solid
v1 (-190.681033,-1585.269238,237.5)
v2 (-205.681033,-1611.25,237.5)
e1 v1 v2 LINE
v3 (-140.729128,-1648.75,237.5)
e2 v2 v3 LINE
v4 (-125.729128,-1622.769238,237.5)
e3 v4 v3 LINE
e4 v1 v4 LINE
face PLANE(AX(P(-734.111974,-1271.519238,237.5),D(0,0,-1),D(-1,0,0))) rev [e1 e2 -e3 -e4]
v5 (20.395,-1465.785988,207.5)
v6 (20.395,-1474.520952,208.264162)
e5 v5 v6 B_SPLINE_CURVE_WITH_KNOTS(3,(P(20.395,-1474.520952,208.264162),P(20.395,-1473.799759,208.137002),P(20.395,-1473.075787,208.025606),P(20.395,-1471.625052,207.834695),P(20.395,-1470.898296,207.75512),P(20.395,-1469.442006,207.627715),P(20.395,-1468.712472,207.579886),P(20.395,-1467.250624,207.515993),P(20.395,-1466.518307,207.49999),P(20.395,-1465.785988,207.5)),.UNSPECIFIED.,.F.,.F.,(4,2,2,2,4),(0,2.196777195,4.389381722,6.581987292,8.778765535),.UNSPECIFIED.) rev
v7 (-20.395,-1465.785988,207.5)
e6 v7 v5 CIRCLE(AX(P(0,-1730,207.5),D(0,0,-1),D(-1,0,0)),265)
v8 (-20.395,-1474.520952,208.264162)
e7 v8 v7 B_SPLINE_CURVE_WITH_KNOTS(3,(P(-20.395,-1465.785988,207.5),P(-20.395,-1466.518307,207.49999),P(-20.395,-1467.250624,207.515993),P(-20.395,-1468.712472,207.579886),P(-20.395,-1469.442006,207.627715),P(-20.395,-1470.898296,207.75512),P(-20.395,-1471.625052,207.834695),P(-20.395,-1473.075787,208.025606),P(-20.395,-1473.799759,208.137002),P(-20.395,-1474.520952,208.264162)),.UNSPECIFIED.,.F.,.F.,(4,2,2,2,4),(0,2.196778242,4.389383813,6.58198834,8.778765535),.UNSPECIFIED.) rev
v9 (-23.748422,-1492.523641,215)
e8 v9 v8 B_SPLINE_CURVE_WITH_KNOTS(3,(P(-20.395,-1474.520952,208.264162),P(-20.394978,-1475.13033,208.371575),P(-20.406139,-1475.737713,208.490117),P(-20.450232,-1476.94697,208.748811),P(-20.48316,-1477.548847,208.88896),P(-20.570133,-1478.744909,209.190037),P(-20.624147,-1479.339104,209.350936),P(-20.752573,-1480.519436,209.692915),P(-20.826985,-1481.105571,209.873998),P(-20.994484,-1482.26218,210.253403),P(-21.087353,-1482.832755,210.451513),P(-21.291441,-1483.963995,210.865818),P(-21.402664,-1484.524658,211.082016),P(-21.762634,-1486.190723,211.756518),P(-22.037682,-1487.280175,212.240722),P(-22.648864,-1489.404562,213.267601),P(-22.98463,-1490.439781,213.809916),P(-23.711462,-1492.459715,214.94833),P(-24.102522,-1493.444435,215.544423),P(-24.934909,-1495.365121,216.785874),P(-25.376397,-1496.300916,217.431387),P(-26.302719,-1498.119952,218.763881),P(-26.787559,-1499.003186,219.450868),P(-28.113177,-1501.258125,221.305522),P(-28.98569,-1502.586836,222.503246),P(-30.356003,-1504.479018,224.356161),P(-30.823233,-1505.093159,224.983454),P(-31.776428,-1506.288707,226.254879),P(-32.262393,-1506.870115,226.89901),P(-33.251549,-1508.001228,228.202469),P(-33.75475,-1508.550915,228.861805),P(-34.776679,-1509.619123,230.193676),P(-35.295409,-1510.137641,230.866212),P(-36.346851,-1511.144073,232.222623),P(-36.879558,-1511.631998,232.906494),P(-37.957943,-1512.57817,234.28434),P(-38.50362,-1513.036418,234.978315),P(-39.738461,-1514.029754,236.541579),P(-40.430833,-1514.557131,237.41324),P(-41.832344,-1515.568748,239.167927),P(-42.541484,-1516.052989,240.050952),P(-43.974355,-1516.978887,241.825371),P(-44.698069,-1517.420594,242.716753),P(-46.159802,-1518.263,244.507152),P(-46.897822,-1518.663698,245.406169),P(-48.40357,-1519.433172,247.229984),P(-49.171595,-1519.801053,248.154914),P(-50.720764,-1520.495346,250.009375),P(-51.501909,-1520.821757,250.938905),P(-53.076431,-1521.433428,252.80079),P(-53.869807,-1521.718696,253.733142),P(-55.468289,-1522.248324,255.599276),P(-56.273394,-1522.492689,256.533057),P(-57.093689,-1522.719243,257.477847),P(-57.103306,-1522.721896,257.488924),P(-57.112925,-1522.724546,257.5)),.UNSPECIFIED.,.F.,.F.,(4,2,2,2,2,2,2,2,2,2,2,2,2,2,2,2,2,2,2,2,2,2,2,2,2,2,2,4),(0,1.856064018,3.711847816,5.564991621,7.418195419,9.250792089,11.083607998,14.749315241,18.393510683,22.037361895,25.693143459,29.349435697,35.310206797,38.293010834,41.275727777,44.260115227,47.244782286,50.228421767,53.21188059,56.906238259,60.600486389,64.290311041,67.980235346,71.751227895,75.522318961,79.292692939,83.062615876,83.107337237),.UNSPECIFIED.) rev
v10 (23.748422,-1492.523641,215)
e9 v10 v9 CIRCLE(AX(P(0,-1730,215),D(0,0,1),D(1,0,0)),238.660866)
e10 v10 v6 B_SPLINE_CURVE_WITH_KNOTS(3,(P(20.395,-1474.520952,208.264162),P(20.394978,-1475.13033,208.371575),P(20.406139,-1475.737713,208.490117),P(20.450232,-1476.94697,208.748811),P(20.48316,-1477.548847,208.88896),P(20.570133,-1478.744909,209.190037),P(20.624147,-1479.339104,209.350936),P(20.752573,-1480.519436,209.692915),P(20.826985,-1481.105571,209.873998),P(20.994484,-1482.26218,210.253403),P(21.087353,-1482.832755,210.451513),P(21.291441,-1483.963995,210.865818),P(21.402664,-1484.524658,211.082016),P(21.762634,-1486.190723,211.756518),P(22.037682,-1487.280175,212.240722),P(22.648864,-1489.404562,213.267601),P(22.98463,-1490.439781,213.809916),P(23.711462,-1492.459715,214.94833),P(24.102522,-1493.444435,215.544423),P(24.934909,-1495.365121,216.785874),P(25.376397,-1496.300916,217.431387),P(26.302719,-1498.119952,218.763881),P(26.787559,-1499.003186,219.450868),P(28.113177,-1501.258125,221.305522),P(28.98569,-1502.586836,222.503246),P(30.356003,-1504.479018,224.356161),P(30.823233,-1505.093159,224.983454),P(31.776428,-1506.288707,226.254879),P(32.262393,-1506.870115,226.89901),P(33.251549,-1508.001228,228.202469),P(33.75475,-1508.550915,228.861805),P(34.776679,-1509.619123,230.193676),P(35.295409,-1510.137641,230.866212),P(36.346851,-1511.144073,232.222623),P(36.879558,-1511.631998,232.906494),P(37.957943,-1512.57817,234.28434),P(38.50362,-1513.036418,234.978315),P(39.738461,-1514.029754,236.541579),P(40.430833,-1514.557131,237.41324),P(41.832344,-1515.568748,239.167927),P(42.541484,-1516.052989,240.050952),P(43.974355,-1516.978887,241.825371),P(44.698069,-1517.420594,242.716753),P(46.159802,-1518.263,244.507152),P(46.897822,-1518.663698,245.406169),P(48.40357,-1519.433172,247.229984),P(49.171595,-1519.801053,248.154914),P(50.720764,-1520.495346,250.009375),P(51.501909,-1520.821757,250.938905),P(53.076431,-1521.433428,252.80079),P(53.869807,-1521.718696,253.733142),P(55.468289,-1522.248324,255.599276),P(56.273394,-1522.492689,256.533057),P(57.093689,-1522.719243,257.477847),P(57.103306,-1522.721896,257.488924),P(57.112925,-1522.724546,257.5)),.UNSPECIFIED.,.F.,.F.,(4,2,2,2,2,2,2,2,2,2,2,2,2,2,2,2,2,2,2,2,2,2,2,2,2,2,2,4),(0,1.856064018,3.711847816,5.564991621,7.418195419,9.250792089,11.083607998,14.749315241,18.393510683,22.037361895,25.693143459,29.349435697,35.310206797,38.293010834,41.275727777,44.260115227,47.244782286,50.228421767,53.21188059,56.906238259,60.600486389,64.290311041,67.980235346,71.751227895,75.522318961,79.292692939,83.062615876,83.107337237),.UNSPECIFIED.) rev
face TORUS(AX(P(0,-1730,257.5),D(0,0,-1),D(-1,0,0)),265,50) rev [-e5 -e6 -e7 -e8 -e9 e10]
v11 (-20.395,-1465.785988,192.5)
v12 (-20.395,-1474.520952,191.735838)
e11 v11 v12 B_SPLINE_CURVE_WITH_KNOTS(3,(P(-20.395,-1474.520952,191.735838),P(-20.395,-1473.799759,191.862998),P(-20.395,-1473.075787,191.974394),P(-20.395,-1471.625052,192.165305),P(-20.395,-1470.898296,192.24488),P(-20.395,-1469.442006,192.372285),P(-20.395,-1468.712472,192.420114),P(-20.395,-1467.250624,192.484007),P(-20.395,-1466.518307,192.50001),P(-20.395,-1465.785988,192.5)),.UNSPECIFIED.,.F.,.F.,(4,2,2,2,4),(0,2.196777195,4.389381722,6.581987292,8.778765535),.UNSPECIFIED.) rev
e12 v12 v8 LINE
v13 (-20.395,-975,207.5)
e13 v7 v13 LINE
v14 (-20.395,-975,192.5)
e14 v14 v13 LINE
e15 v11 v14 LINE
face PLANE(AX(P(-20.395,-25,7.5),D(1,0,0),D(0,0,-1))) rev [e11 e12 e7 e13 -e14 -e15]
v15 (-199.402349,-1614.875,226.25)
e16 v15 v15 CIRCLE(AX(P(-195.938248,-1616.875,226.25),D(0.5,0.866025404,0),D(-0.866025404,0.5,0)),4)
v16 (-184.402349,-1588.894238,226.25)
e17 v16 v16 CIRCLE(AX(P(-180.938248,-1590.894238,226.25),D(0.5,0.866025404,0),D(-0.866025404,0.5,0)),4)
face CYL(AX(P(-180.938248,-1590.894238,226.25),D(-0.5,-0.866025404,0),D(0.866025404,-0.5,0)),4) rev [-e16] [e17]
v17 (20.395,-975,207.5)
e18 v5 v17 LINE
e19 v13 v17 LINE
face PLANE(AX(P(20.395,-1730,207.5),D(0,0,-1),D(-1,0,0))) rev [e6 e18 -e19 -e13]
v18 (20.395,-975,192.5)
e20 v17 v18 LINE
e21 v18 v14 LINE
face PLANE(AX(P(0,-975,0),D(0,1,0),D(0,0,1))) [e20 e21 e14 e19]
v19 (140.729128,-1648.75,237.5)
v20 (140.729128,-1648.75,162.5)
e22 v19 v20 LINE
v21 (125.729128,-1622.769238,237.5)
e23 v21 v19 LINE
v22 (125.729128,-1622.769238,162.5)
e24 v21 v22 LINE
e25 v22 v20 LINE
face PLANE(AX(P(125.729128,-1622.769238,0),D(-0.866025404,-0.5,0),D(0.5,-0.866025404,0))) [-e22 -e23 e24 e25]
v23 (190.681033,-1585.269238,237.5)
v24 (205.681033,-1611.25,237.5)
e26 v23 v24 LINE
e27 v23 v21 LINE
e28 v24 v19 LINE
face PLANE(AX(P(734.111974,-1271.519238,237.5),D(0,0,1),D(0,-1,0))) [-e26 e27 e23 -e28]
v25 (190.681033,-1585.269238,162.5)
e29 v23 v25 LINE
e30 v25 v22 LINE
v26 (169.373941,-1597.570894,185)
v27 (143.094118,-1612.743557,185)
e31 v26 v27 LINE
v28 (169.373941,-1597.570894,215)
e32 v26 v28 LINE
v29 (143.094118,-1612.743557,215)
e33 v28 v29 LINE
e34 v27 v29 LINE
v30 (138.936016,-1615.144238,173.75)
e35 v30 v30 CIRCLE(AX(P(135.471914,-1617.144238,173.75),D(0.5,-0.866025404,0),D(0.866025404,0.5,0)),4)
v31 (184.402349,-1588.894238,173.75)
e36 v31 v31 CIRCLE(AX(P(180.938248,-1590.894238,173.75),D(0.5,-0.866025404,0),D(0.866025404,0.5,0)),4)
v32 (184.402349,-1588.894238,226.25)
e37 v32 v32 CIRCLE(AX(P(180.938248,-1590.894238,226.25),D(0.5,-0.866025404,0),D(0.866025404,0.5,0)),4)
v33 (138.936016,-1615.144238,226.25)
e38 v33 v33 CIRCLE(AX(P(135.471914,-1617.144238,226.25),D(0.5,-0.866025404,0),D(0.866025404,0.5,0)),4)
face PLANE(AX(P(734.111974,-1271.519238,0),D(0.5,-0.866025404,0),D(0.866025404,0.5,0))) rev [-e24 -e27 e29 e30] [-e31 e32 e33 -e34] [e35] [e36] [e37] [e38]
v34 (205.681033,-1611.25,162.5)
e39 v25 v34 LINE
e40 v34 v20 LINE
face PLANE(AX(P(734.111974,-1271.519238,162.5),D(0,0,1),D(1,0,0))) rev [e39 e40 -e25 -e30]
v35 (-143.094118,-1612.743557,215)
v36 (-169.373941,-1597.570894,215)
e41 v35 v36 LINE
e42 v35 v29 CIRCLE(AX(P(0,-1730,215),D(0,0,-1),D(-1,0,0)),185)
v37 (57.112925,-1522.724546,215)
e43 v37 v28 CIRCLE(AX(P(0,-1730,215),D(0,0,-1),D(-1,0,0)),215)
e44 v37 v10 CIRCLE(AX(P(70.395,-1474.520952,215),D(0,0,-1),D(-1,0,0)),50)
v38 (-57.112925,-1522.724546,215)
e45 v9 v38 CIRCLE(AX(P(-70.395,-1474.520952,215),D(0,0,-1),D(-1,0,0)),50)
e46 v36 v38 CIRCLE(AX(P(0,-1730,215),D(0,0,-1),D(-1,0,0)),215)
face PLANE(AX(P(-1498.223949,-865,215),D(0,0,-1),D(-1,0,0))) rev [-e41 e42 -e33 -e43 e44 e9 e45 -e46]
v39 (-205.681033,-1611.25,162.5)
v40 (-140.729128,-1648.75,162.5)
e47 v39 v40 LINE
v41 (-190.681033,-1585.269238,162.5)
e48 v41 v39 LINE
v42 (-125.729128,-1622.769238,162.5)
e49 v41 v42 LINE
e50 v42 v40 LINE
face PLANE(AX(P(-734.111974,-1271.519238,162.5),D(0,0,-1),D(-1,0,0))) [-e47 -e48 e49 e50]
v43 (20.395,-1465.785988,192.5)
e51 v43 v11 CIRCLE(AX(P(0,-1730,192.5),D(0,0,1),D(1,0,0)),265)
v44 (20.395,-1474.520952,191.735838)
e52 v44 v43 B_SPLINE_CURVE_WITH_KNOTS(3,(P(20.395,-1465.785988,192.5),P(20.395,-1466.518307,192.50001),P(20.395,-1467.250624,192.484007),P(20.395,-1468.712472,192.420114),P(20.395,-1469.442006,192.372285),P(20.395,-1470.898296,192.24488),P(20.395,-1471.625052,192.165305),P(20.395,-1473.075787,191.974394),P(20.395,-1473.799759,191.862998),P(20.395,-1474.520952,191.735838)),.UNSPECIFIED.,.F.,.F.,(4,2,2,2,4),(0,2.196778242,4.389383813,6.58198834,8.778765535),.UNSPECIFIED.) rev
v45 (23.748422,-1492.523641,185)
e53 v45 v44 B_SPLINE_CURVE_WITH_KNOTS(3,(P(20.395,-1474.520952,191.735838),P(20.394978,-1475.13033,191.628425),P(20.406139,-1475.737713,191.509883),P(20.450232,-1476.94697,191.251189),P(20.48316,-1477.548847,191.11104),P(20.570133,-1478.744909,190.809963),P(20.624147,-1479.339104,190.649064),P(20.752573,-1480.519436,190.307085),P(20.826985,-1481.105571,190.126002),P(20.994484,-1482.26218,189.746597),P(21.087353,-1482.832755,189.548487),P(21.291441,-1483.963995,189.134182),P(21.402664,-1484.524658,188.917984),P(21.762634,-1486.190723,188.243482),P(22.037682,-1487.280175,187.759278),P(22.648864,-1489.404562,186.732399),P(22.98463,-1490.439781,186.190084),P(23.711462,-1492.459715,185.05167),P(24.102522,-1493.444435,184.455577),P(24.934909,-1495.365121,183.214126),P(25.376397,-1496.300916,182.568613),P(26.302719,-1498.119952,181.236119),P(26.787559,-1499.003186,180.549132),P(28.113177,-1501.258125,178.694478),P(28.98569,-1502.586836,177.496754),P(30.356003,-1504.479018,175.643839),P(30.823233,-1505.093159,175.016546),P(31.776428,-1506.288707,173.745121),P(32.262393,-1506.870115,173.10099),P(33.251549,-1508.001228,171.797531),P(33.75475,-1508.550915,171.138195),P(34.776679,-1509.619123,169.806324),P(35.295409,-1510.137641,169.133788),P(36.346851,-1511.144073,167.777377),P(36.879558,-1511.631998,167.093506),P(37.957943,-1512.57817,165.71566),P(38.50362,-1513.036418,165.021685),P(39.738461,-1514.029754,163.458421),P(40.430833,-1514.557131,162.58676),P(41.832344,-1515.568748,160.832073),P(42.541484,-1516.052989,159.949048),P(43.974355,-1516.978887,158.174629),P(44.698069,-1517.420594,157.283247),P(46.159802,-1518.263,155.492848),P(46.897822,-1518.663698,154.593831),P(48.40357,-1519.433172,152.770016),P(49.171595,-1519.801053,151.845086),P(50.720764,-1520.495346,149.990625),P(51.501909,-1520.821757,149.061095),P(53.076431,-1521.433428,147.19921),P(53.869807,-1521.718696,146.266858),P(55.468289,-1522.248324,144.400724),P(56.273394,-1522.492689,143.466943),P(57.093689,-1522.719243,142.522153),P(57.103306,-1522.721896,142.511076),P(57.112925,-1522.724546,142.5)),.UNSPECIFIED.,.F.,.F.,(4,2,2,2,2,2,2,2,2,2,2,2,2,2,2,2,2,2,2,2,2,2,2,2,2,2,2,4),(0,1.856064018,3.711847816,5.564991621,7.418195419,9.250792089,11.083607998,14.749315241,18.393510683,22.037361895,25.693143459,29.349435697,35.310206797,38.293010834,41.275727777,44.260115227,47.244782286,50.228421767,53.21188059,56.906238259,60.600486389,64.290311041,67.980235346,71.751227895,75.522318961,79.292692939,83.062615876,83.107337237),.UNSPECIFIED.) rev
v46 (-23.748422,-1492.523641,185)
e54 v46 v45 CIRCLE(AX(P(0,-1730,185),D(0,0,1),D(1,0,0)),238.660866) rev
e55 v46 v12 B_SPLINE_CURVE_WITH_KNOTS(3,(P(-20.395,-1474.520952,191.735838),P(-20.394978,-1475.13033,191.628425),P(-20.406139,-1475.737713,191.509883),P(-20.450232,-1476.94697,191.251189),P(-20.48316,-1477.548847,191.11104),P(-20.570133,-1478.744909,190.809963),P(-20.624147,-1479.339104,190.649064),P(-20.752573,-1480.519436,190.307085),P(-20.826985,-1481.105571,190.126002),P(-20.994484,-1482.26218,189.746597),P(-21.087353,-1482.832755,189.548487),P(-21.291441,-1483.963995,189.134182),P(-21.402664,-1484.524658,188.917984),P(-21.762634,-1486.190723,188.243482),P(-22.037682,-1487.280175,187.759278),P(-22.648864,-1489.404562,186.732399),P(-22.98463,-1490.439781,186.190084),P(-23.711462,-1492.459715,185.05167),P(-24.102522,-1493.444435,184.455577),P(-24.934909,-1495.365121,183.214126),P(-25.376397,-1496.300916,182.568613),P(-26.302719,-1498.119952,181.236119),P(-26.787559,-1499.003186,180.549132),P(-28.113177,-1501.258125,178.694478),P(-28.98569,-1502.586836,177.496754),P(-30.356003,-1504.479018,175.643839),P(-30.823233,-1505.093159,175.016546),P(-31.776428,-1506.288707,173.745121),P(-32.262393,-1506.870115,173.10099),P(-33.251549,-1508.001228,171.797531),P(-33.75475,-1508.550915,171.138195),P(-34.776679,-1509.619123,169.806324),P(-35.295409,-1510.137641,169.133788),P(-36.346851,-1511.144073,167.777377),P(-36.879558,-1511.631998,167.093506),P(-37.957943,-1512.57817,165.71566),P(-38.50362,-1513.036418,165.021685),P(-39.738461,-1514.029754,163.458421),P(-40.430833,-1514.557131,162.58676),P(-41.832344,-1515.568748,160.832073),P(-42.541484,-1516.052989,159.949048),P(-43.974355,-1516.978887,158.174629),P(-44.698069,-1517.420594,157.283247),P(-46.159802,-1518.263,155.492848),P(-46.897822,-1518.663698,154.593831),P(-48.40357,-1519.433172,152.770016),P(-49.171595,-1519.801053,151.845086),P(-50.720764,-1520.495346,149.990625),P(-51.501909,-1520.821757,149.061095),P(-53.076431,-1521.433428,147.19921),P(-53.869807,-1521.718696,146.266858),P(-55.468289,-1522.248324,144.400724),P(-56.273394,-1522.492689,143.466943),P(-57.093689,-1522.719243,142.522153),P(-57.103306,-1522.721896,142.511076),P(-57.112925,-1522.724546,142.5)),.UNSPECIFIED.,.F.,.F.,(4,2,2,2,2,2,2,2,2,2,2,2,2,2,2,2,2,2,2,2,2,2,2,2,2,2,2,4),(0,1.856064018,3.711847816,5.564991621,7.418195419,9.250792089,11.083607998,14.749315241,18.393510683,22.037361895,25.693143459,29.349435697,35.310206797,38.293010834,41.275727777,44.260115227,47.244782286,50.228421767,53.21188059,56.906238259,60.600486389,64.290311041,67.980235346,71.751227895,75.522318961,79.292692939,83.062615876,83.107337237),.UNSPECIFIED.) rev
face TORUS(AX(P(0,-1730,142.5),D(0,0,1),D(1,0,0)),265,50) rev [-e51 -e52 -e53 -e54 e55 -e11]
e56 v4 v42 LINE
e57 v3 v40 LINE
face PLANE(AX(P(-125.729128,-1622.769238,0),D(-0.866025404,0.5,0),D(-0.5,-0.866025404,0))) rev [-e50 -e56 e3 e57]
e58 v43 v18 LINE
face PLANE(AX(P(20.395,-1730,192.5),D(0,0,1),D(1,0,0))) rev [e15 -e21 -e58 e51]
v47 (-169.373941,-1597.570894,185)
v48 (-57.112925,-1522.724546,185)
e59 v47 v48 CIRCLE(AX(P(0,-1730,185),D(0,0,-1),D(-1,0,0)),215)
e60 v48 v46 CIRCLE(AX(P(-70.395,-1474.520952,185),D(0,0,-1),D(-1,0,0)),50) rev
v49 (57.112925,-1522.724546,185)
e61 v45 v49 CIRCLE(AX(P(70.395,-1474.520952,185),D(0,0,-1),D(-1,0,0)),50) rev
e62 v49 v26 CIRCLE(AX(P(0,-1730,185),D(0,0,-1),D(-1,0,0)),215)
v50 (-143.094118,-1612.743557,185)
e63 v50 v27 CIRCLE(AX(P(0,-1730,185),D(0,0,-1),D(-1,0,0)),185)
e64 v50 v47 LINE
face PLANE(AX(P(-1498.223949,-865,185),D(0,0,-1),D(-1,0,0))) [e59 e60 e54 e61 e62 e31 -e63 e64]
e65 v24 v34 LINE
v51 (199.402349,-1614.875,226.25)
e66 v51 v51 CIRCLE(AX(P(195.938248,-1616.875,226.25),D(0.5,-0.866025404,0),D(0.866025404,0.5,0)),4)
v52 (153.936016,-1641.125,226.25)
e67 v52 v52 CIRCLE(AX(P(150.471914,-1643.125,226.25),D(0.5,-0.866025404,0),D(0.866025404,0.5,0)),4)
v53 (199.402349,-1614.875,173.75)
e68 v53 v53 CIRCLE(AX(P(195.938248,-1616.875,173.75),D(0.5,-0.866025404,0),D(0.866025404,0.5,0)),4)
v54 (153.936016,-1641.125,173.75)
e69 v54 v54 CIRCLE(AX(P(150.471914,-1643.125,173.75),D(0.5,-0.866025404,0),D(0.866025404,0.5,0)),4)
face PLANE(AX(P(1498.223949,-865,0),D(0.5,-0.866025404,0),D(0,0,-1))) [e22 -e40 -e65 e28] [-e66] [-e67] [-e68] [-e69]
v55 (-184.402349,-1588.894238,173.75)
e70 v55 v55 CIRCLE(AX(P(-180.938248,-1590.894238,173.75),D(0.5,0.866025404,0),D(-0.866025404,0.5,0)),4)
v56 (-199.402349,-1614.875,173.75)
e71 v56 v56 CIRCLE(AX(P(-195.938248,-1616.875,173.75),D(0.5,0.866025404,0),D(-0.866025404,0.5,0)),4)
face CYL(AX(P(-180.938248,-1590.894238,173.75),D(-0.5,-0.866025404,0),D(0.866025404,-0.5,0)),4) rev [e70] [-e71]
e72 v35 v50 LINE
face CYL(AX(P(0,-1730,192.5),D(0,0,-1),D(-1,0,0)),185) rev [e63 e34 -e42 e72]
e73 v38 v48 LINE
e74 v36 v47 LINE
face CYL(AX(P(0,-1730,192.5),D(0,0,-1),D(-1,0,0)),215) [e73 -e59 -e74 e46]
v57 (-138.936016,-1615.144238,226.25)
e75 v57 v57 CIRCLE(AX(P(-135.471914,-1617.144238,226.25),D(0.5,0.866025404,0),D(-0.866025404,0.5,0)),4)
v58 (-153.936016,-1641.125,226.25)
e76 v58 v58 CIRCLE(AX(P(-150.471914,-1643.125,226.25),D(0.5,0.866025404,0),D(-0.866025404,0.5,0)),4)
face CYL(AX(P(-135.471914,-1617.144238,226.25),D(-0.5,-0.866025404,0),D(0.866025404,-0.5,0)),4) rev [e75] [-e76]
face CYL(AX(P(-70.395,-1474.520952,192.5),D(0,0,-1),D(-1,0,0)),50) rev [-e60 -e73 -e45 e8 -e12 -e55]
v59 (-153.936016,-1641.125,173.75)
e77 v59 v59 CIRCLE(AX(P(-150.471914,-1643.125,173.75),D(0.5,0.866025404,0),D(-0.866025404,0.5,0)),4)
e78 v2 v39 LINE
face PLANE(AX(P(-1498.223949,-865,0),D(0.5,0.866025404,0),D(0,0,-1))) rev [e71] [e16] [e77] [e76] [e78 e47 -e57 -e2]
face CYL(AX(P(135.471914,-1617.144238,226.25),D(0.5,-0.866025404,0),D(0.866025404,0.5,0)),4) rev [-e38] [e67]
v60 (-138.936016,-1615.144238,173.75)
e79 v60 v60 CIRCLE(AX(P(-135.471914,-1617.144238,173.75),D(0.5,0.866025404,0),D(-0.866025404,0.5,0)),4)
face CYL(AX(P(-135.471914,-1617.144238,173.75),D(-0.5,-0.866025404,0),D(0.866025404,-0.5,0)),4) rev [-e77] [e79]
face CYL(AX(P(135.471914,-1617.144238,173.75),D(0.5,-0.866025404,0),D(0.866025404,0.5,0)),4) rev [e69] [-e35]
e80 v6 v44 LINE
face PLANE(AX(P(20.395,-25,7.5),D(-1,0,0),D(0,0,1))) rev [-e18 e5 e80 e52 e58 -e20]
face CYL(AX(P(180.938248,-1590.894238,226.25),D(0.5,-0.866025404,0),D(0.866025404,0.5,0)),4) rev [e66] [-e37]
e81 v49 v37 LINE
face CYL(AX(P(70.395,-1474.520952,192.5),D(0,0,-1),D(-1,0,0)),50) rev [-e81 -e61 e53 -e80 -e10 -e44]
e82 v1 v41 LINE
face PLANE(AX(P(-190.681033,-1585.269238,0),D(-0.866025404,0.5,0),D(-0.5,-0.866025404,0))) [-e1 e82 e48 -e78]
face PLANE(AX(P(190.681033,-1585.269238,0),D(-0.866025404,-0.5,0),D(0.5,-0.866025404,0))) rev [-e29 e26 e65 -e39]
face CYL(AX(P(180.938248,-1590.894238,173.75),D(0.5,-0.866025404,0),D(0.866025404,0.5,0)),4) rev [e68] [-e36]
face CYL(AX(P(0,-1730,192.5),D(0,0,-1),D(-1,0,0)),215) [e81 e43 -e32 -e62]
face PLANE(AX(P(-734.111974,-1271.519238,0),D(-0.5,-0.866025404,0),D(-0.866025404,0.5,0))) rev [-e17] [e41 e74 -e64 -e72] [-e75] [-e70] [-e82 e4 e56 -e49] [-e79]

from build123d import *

# Parameters (mm, degrees)
SKETCH1_R                = 8.2
BOSS_EXTRUDE1_DEPTH      = 25
SKETCH2_W                = 40.79
SKETCH2_H                = 15
BOSS_EXTRUDE2_DEPTH      = 25
SKETCH3_R                = 12.5
BOSS_EXTRUDE4_DEPTH      = 25
BOSS_EXTRUDE5_REACH      = 51.448
SKETCH5_W                = 40.79
SKETCH5_H                = 15
BOSS_EXTRUDE7_DEPTH      = 1505
BOSS_EXTRUDE8_START      = -40.79
BOSS_EXTRUDE8_DEPTH      = 40.79
SKETCH9_W                = 15
SKETCH9_H                = 15
REVOLVE1_ANGLE           = 60
REVOLVE1_OTHER_WAY_ANGLE = 60
FILLET3_R                = 50
SKETCH11_W               = 75
SKETCH11_H               = 75
SKETCH11_R               = 4
BOSS_EXTRUDE9_DEPTH      = 30
CUT_EXTRUDE2_DEPTH       = 1755.203433898
SKETCH16_R               = 677.859439882
CUT_EXTRUDE3_DEPTH       = 1049.19413159


with BuildPart() as part:
    # Sketch1 → Boss-Extrude1 (new body)
    with BuildSketch(Plane(origin=(0, 0, 0), x_dir=(1, 0, 0), z_dir=(0, 1, 0))):
        with Locations(Location((0, 0, 0), (0, 0, 270))):
            Circle(SKETCH1_R)
    extrude(amount=BOSS_EXTRUDE1_DEPTH)

    # Sketch2 → Boss-Extrude2 (add)
    with BuildSketch(Plane(origin=(0, 0, 0), x_dir=(-1, 0, 0), z_dir=(0, -1, 0))):
        Rectangle(SKETCH2_W, SKETCH2_H)
    extrude(amount=BOSS_EXTRUDE2_DEPTH)

    # Sketch3 → Boss-Extrude4 (add)
    with BuildSketch(Plane(origin=(0, -25, 0), x_dir=(-1, 0, 0), z_dir=(0, -1, 0))):
        Circle(SKETCH3_R)
    extrude(amount=-BOSS_EXTRUDE4_DEPTH)

    # Boss-Extrude5: up to this face of the body (flat: up to its plane)
    boss_extrude5_end = Plane(part.part.faces().sort_by_distance((20.395, -12.5, 0))[0])
    # Sketch4 → Boss-Extrude5 (add, up to the picked face)
    with BuildSketch(Plane.ZY.offset(20.395), mode=Mode.PRIVATE) as boss_extrude5_sk1:
        Polygon((192.5, -225), (-7.5, -25), (7.5, -25), (207.5, -225), align=None)
    boss_extrude5_tool1 = split(extrude(boss_extrude5_sk1.sketch, amount=-BOSS_EXTRUDE5_REACH, mode=Mode.PRIVATE), bisect_by=boss_extrude5_end, keep=Keep.BOTH, mode=Mode.PRIVATE)
    add(boss_extrude5_tool1.solids().sort_by(Axis((-20.395, -125, 100), (1, 0, 0)))[0])

    # Sketch5 → Boss-Extrude7 (add)
    with BuildSketch(Plane(origin=(0, -225, 0), x_dir=(-1, 0, 0), z_dir=(0, -1, 0))):
        with Locations((0, -200)):
            Rectangle(SKETCH5_W, SKETCH5_H)
    extrude(amount=BOSS_EXTRUDE7_DEPTH)

    # Sketch7 → Boss-Extrude8 (add)
    with BuildSketch(Plane(origin=(20.395, 0, 0), x_dir=(0, 0, -1), z_dir=(1, 0, 0)).offset(BOSS_EXTRUDE8_START)):
        Polygon((1.552099385, -34.052099385), (0, -32.5), (-192.5, -225), (-192.5, -228.104198769), align=None)
        Polygon((7.5, -25), (0, -32.5), (1.552099385, -34.052099385), (7.5, -28.104198769), align=None)
        Polygon((-9.052099385, -23.447900615), (-207.5, -221.895801231), (-207.5, -225), (-7.5, -25), align=None)
        Polygon((-9.052099385, -23.447900615), (-7.5, -25), (-7.5, -21.895801231), align=None)
    extrude(amount=BOSS_EXTRUDE8_DEPTH)

    # Sketch9 → Revolve1 (revolve)
    with BuildSketch(Plane(origin=(0, 0, 0), x_dir=(0, 0, -1), z_dir=(1, 0, 0))):
        with Locations((-207.5, -1522.5)):
            Rectangle(SKETCH9_W, SKETCH9_H)
        Polygon((-185, -1545), (-185, -1530), (-200, -1530), (-215, -1530), (-215, -1545), align=None)
        with Locations((-192.5, -1522.5)):
            Rectangle(SKETCH9_W, SKETCH9_H)
    revolve(axis=Axis((0, -1730, 192.5), (0, 0, 1)), revolution_arc=REVOLVE1_ANGLE)

    # Sketch9 → Revolve1 other way (revolve)
    with BuildSketch(Plane(origin=(0, 0, 0), x_dir=(0, 0, -1), z_dir=(1, 0, 0))):
        with Locations((-207.5, -1522.5)):
            Rectangle(SKETCH9_W, SKETCH9_H)
        Polygon((-185, -1545), (-185, -1530), (-200, -1530), (-215, -1530), (-215, -1545), align=None)
        with Locations((-192.5, -1522.5)):
            Rectangle(SKETCH9_W, SKETCH9_H)
    revolve(axis=Axis((0, -1730, 192.5), (0, 0, -1)), revolution_arc=REVOLVE1_OTHER_WAY_ANGLE)

    # Fillet3
    # the kernel refuses this fillet: 50 mm, written as the material it adds along each edge
    with BuildSketch(Plane(origin=(0, -1730, 207.5), x_dir=(0.6259913130832682, 0.7798300301631668, 0), z_dir=(0.7798300301631668, -0.6259913130832682, 0))) as fillet3_piece_1_section:
        with BuildLine():
            CenterArc((215 + FILLET3_R, FILLET3_R), FILLET3_R, 180, 90)
            Line((215, FILLET3_R), (215, 0))
            Line((215, 0), (215 + FILLET3_R, 0))
        make_face()
    fillet3_piece_1 = revolve(axis=Axis((0, -1730, 207.5), (0, 0, 1)), revolution_arc=77.509968484, mode=Mode.PRIVATE)
    fillet3_piece_1 = split(fillet3_piece_1, bisect_by=Plane(origin=(20.395, -1497.728593149, 210.201005202), z_dir=(-1, 0, 0)), keep=Keep.TOP, mode=Mode.PRIVATE)
    fillet3_piece_1 = split(fillet3_piece_1, bisect_by=Plane(origin=(-20.395, -1497.728593149, 210.201005202), z_dir=(1, 0, 0)), keep=Keep.TOP, mode=Mode.PRIVATE)
    fillet3_piece_1 = split(fillet3_piece_1, bisect_by=Plane(origin=(0, -1497.728593149, 215), z_dir=(0, 0, -1)), keep=Keep.TOP, mode=Mode.PRIVATE)
    add(fillet3_piece_1)
    with BuildSketch(Plane(origin=(-20.395, -1515.969525593, 192.5), x_dir=(-0.9834951946600375, -0.1809342479482942, 0), z_dir=(0, 0, 1))) as fillet3_piece_2:
        with BuildLine():
            CenterArc((41.675293239, -49.811185367), FILLET3_R, 94.980893043, 74.594925131)
            Line((-7.499466494, -40.764472969), (0, 0))
            ThreePointArc((0, 0), (18.66705843, -0.811902923), (37.33411686, 0))
        make_face()
    extrude(amount=15)
    with BuildSketch(Plane(origin=(0, -1730, 192.5), x_dir=(0.6259913130832687, 0.7798300301631664, 0), z_dir=(0.7798300301631664, -0.6259913130832687, 0))) as fillet3_piece_3_section:
        with BuildLine():
            CenterArc((215 + FILLET3_R, -FILLET3_R), FILLET3_R, 90, 90)
            Line((215 + FILLET3_R, 0), (215, 0))
            Line((215, 0), (215, -FILLET3_R))
        make_face()
    fillet3_piece_3 = revolve(axis=Axis((0, -1730, 192.5), (0, 0, 1)), revolution_arc=77.509968484, mode=Mode.PRIVATE)
    fillet3_piece_3 = split(fillet3_piece_3, bisect_by=Plane(origin=(0, -1497.728593149, 185), z_dir=(0, 0, 1)), keep=Keep.TOP, mode=Mode.PRIVATE)
    fillet3_piece_3 = split(fillet3_piece_3, bisect_by=Plane(origin=(-20.395, -1497.728593149, 189.798994798), z_dir=(1, 0, 0)), keep=Keep.TOP, mode=Mode.PRIVATE)
    fillet3_piece_3 = split(fillet3_piece_3, bisect_by=Plane(origin=(20.395, -1497.728593149, 189.798994798), z_dir=(-1, 0, 0)), keep=Keep.TOP, mode=Mode.PRIVATE)
    add(fillet3_piece_3)
    with BuildSketch(Plane(origin=(20.395, -1515.969525593, 192.5), x_dir=(0.9834951946600374, -0.18093424794829469, 0), z_dir=(0, 0, 1))) as fillet3_piece_4:
        with BuildLine():
            CenterArc((41.675293239, 49.811185367), FILLET3_R, 190.424181826, 74.594925131)
            Line((-7.499466494, 40.764472969), (0, 0))
            ThreePointArc((0, 0), (18.66705843, 0.811902923), (37.33411686, 0))
        make_face()
    extrude(amount=15)
    with BuildSketch(Plane(origin=(0, -1730, 207.5), x_dir=(0.6259913130832682, 0.7798300301631668, 0), z_dir=(0.7798300301631668, -0.6259913130832682, 0))) as fillet3_piece_5a_section:
        with BuildLine():
            CenterArc((215 + FILLET3_R, FILLET3_R), FILLET3_R, 180, 90)
            Line((215, FILLET3_R), (215, 0))
            Line((215, 0), (215 + FILLET3_R, 0))
        make_face()
    fillet3_piece_5a = revolve(axis=Axis((0, -1730, 207.5), (0, 0, 1)), revolution_arc=77.509968484, mode=Mode.PRIVATE)
    fillet3_piece_5a = split(fillet3_piece_5a, bisect_by=Plane(origin=(20.395, -1516.663886588, 210.150724115), z_dir=(1, 0, 0)), keep=Keep.TOP, mode=Mode.PRIVATE)
    fillet3_piece_5a = split(fillet3_piece_5a, bisect_by=Plane(origin=(85.698064456, -1516.663886588, 215), z_dir=(0, 0, -1)), keep=Keep.TOP, mode=Mode.PRIVATE)
    with BuildSketch(Plane(origin=(20.395, -1515.969525593, 192.5), x_dir=(0.9834951946600374, -0.18093424794829469, 0), z_dir=(0, 0, 1))) as fillet3_piece_5b_section:
        with BuildLine():
            CenterArc((41.675293239, 49.811185367), FILLET3_R, 190.424181826, 74.594925131)
            Line((-7.499466494, 40.764472969), (0, 0))
            ThreePointArc((0, 0), (18.66705843, 0.811902923), (37.33411686, 0))
        make_face()
    fillet3_piece_5b = extrude(amount=118.621434021, mode=Mode.PRIVATE)
    fillet3_piece_5b = split(fillet3_piece_5b, bisect_by=Plane(origin=(28.539652215, -1507.603520272, 207.5), z_dir=(0, 0, 1)), keep=Keep.TOP, mode=Mode.PRIVATE)
    fillet3_piece_5b = split(fillet3_piece_5b, bisect_by=Plane(origin=(28.539652215, -1507.603520272, 215), z_dir=(0, 0, -1)), keep=Keep.TOP, mode=Mode.PRIVATE)
    fillet3_piece_5 = fillet3_piece_5a & fillet3_piece_5b
    add(fillet3_piece_5)
    with BuildSketch(Plane(origin=(0, -1730, 207.5), x_dir=(0.6259913130832682, 0.7798300301631668, 0), z_dir=(0.7798300301631668, -0.6259913130832682, 0))) as fillet3_piece_6a_section:
        with BuildLine():
            CenterArc((215 + FILLET3_R, FILLET3_R), FILLET3_R, 180, 90)
            Line((215, FILLET3_R), (215, 0))
            Line((215, 0), (215 + FILLET3_R, 0))
        make_face()
    fillet3_piece_6a = revolve(axis=Axis((0, -1730, 207.5), (0, 0, 1)), revolution_arc=77.509968484, mode=Mode.PRIVATE)
    fillet3_piece_6a = split(fillet3_piece_6a, bisect_by=Plane(origin=(-20.395, -1516.663887252, 210.150724175), z_dir=(-1, 0, 0)), keep=Keep.TOP, mode=Mode.PRIVATE)
    fillet3_piece_6a = split(fillet3_piece_6a, bisect_by=Plane(origin=(-85.69806423, -1516.663887252, 215), z_dir=(0, 0, -1)), keep=Keep.TOP, mode=Mode.PRIVATE)
    with BuildSketch(Plane(origin=(-20.395, -1515.969525593, 192.5), x_dir=(-0.9834951946600375, -0.1809342479482942, 0), z_dir=(0, 0, 1))) as fillet3_piece_6b_section:
        with BuildLine():
            CenterArc((41.675293239, -49.811185367), FILLET3_R, 94.980893043, 74.594925131)
            Line((-7.499466494, -40.764472969), (0, 0))
            ThreePointArc((0, 0), (18.66705843, -0.811902923), (37.33411686, 0))
        make_face()
    fillet3_piece_6b = extrude(amount=118.621434021, mode=Mode.PRIVATE)
    fillet3_piece_6b = split(fillet3_piece_6b, bisect_by=Plane(origin=(-28.539652215, -1507.603520272, 207.5), z_dir=(0, 0, 1)), keep=Keep.TOP, mode=Mode.PRIVATE)
    fillet3_piece_6b = split(fillet3_piece_6b, bisect_by=Plane(origin=(-28.539652215, -1507.603520272, 215), z_dir=(0, 0, -1)), keep=Keep.TOP, mode=Mode.PRIVATE)
    fillet3_piece_6 = fillet3_piece_6a & fillet3_piece_6b
    add(fillet3_piece_6)
    with BuildSketch(Plane(origin=(0, -1730, 192.5), x_dir=(0.6259913130832687, 0.7798300301631664, 0), z_dir=(0.7798300301631664, -0.6259913130832687, 0))) as fillet3_piece_7a_section:
        with BuildLine():
            CenterArc((215 + FILLET3_R, -FILLET3_R), FILLET3_R, 90, 90)
            Line((215 + FILLET3_R, 0), (215, 0))
            Line((215, 0), (215, -FILLET3_R))
        make_face()
    fillet3_piece_7a = revolve(axis=Axis((0, -1730, 192.5), (0, 0, 1)), revolution_arc=77.509968484, mode=Mode.PRIVATE)
    fillet3_piece_7a = split(fillet3_piece_7a, bisect_by=Plane(origin=(-85.69806423, -1516.663887252, 185), z_dir=(0, 0, 1)), keep=Keep.TOP, mode=Mode.PRIVATE)
    fillet3_piece_7a = split(fillet3_piece_7a, bisect_by=Plane(origin=(-20.395, -1516.663887252, 189.849275825), z_dir=(-1, 0, 0)), keep=Keep.TOP, mode=Mode.PRIVATE)
    with BuildSketch(Plane(origin=(-20.395, -1515.969525593, 88.878565979), x_dir=(-0.9834951946600375, -0.1809342479482942, 0), z_dir=(0, 0, 1))) as fillet3_piece_7b_section:
        with BuildLine():
            CenterArc((41.675293239, -49.811185367), FILLET3_R, 94.980893043, 74.594925131)
            Line((-7.499466494, -40.764472969), (0, 0))
            ThreePointArc((0, 0), (18.66705843, -0.811902923), (37.33411686, 0))
        make_face()
    fillet3_piece_7b = extrude(amount=118.621434021, mode=Mode.PRIVATE)
    fillet3_piece_7b = split(fillet3_piece_7b, bisect_by=Plane(origin=(-28.539652215, -1507.603520272, 185), z_dir=(0, 0, 1)), keep=Keep.TOP, mode=Mode.PRIVATE)
    fillet3_piece_7b = split(fillet3_piece_7b, bisect_by=Plane(origin=(-28.539652215, -1507.603520272, 192.5), z_dir=(0, 0, -1)), keep=Keep.TOP, mode=Mode.PRIVATE)
    fillet3_piece_7 = fillet3_piece_7a & fillet3_piece_7b
    add(fillet3_piece_7)
    with BuildSketch(Plane(origin=(0, -1730, 192.5), x_dir=(0.6259913130832687, 0.7798300301631664, 0), z_dir=(0.7798300301631664, -0.6259913130832687, 0))) as fillet3_piece_8a_section:
        with BuildLine():
            CenterArc((215 + FILLET3_R, -FILLET3_R), FILLET3_R, 90, 90)
            Line((215 + FILLET3_R, 0), (215, 0))
            Line((215, 0), (215, -FILLET3_R))
        make_face()
    fillet3_piece_8a = revolve(axis=Axis((0, -1730, 192.5), (0, 0, 1)), revolution_arc=77.509968484, mode=Mode.PRIVATE)
    fillet3_piece_8a = split(fillet3_piece_8a, bisect_by=Plane(origin=(85.698064456, -1516.663886588, 185), z_dir=(0, 0, 1)), keep=Keep.TOP, mode=Mode.PRIVATE)
    fillet3_piece_8a = split(fillet3_piece_8a, bisect_by=Plane(origin=(20.395, -1516.663886588, 189.849275885), z_dir=(1, 0, 0)), keep=Keep.TOP, mode=Mode.PRIVATE)
    with BuildSketch(Plane(origin=(20.395, -1515.969525593, 88.878565979), x_dir=(0.9834951946600374, -0.1809342479482948, 0), z_dir=(0, 0, 1))) as fillet3_piece_8b_section:
        with BuildLine():
            CenterArc((41.675293239, 49.811185367), FILLET3_R, 190.424181826, 74.594925131)
            Line((-7.499466494, 40.764472969), (0, 0))
            ThreePointArc((0, 0), (18.66705843, 0.811902923), (37.33411686, 0))
        make_face()
    fillet3_piece_8b = extrude(amount=118.621434021, mode=Mode.PRIVATE)
    fillet3_piece_8b = split(fillet3_piece_8b, bisect_by=Plane(origin=(28.539652215, -1507.603520272, 185), z_dir=(0, 0, 1)), keep=Keep.TOP, mode=Mode.PRIVATE)
    fillet3_piece_8b = split(fillet3_piece_8b, bisect_by=Plane(origin=(28.539652215, -1507.603520272, 192.5), z_dir=(0, 0, -1)), keep=Keep.TOP, mode=Mode.PRIVATE)
    fillet3_piece_8 = fillet3_piece_8a & fillet3_piece_8b
    add(fillet3_piece_8)

    # Sketch11 → Boss-Extrude9 (add)
    with BuildSketch(Plane(origin=(749.111974274, -1297.5, 0), x_dir=(-0.8660254037844398, -0.49999999999999806, 0), z_dir=(0.499999999999998, -0.8660254037844397, 0))):
        with Locations((665, -200)):
            Rectangle(SKETCH11_W, SKETCH11_H)
        with Locations(Location((638.75, -173.75, 0), (0, 0, 180))):
            Circle(SKETCH11_R, mode=Mode.SUBTRACT)
        with Locations(Location((691.25, -173.75, 0), (0, 0, 180))):
            Circle(SKETCH11_R, mode=Mode.SUBTRACT)
        with Locations(Location((691.25, -226.25, 0), (0, 0, 180))):
            Circle(SKETCH11_R, mode=Mode.SUBTRACT)
        with Locations(Location((638.75, -226.25, 0), (0, 0, 180))):
            Circle(SKETCH11_R, mode=Mode.SUBTRACT)
    boss_extrude9 = extrude(amount=-BOSS_EXTRUDE9_DEPTH)

    # Mirror1: Boss-Extrude9 across plane
    add(boss_extrude9.mirror(Plane(origin=(0, 0, 0), x_dir=(0, 0, 1), z_dir=(1, 0, 0))))

    # Sketch15 → Cut-Extrude2 (cut, through all)
    with BuildSketch(Plane(origin=(0, 0, 192.5), x_dir=(-1, 0, 0), z_dir=(0, 0, -1))):
        with BuildLine():
            Line((-20.395, -1730), (-20.395, -1546.127642167))
            ThreePointArc((-20.395, -1546.127642167), (0, -1545), (20.395, -1546.127642167))
            Line((20.395, -1546.127642167), (20.395, -1730))
            Line((20.395, -1730), (-20.395, -1730))
        make_face()
    extrude(amount=-CUT_EXTRUDE2_DEPTH, mode=Mode.SUBTRACT)

    # Sketch16 → Cut-Extrude3 (cut, through all)
    with BuildSketch(Plane(origin=(0, -975, 0), x_dir=(1, 0, 0), z_dir=(0, 1, 0))):
        Circle(SKETCH16_R)
    extrude(amount=CUT_EXTRUDE3_DEPTH, mode=Mode.SUBTRACT)


solid = part.part
